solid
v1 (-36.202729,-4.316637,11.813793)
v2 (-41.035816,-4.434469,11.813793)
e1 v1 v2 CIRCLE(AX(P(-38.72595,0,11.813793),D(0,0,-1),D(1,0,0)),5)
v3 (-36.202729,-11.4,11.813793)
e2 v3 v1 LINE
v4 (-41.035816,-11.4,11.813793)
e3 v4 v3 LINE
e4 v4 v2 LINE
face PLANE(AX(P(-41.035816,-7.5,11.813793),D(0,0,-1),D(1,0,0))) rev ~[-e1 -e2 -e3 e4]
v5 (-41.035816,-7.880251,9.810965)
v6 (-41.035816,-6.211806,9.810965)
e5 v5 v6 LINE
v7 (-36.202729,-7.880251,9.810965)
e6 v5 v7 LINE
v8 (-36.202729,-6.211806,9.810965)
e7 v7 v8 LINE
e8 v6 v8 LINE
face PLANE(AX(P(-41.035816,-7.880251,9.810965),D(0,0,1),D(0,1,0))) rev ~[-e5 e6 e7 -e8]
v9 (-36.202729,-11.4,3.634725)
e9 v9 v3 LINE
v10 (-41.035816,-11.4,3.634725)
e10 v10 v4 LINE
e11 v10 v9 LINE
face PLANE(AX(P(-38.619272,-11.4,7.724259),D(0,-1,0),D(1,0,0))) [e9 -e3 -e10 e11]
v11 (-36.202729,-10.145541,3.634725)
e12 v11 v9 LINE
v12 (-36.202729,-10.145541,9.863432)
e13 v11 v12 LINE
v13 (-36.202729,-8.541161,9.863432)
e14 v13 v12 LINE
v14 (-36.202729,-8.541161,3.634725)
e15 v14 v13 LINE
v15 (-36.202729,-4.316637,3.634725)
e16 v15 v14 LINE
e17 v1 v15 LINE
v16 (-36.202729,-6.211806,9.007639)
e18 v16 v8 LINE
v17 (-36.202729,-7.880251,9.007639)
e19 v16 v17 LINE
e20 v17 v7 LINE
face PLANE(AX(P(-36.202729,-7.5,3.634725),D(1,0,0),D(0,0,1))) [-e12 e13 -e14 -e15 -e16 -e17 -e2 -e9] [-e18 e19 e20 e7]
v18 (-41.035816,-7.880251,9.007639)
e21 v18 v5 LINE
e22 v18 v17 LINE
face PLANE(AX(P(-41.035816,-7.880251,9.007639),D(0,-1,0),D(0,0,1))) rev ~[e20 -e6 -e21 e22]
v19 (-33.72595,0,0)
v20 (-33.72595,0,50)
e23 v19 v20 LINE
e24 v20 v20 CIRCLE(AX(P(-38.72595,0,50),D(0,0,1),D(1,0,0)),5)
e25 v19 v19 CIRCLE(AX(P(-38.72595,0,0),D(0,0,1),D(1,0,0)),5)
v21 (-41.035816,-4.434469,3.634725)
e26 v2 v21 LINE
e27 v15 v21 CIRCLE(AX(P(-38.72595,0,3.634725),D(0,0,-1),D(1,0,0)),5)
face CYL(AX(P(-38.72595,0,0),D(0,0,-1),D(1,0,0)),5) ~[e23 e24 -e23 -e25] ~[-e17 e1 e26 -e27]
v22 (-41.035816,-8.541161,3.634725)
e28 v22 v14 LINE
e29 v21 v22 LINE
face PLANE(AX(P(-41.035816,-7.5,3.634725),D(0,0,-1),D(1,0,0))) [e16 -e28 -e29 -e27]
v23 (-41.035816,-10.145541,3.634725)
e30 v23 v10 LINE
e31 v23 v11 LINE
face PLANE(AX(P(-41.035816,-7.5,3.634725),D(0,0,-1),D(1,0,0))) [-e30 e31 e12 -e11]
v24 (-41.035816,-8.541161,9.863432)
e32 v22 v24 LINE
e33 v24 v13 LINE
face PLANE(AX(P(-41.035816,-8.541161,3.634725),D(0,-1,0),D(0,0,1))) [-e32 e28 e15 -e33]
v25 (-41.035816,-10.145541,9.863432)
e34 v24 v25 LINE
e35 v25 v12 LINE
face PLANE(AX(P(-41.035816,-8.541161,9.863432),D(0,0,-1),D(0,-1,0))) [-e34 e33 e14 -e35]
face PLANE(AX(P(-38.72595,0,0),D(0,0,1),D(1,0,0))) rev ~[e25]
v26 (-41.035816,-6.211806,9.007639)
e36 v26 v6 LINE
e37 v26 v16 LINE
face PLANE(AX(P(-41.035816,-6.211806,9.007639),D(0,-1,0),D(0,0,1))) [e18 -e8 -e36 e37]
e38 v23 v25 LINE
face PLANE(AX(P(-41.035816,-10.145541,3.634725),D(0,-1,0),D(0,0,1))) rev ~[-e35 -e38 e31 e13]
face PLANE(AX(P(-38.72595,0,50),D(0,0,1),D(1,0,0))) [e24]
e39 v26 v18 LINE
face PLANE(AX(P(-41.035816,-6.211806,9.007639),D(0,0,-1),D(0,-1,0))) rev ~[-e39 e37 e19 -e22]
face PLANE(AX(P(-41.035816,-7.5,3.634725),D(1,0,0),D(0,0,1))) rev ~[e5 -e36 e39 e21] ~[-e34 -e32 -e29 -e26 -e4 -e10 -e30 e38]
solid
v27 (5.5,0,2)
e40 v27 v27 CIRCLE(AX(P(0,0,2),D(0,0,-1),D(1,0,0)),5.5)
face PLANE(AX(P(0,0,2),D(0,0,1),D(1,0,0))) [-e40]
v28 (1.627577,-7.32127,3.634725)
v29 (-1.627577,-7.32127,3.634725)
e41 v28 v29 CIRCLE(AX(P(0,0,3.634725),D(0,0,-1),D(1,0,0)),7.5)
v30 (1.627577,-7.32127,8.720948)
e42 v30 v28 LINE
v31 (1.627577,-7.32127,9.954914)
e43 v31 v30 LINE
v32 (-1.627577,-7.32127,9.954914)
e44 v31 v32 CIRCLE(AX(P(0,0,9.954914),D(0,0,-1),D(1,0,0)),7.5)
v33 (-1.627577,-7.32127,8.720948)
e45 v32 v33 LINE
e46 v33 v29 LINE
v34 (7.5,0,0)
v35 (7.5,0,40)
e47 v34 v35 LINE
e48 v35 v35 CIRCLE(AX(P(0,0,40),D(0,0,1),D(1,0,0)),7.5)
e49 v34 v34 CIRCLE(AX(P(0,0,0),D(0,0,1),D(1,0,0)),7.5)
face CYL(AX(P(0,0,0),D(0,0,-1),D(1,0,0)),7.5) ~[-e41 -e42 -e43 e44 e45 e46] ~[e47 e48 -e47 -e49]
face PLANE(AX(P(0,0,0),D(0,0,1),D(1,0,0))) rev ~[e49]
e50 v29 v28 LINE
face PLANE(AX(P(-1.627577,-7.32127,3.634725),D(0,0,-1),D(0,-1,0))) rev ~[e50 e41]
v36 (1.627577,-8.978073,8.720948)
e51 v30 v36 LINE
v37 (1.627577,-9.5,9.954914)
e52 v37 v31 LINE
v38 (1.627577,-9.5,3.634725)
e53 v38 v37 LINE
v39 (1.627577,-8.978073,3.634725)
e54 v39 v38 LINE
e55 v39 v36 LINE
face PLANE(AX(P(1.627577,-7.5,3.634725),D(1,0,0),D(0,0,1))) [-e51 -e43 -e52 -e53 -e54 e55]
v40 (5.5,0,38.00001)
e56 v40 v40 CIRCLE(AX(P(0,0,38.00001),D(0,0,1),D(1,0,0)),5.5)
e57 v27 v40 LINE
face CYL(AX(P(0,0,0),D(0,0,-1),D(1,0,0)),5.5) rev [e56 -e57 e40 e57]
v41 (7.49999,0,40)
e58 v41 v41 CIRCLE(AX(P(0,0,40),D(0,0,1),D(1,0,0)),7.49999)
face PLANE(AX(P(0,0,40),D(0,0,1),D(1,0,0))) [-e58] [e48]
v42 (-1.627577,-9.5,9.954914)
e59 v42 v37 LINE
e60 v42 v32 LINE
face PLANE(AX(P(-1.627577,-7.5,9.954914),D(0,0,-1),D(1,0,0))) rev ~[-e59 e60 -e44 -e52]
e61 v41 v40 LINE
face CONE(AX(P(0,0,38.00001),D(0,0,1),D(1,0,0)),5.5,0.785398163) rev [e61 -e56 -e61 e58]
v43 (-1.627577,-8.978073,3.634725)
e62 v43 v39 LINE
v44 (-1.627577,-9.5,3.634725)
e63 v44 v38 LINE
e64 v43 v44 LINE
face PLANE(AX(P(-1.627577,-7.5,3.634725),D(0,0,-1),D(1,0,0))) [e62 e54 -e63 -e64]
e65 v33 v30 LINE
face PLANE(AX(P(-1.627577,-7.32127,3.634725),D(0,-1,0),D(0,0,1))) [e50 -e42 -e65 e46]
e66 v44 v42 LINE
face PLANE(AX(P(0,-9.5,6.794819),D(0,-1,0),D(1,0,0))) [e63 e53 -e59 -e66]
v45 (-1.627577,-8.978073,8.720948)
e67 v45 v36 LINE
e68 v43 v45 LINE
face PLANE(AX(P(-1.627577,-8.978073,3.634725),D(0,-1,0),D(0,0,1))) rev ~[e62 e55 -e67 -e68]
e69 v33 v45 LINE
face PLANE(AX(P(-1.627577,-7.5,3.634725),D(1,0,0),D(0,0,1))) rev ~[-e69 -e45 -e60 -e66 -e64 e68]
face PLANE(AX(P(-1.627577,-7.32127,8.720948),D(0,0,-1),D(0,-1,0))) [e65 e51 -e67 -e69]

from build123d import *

# Parameters (mm, degrees)
F0_R      = 7.5
F1_DEPTH  = 40
F0_R_2    = 5
F2_DEPTH  = 50
F3_T      = -2
F5_W      = 4.8330873251
F5_H      = 8.1790685654
F6_DEPTH  = 3.9
F5_W_2    = 3.2551530749
F5_H_2    = 6.3201887533
F7_DEPTH  = 2
F8_W      = 1.0505022947
F8_H      = 0.8033253253
F8_W_2    = 0.6179423071
F9_DEPTH  = 4.8330873251
F10_W     = 1.6568034714
F10_H     = 5.0862235948
F11_DEPTH = 3.2551530749
F12_SIZE  = 1.99999
F13_W     = 1.6043800861
F13_H     = 6.2287077308
F14_DEPTH = 4.8330873251


# Not quite as in the source:
# - a fillet or chamfer is up to 0.001 mm smaller than in the source, because OpenCascade refuses the exact size
# - a feature names something its author has since deleted; it is built from what else it names


with BuildPart() as f1:
    # F0 (on Top) → F1 (new body)
    with BuildSketch(Plane.XY):
        Circle(F0_R)
    extrude(amount=F1_DEPTH)

    # F3
    f3_openings = [f1.faces().sort_by_distance(p)[0] for p in [
        (0, 0, 40),
    ]]
    offset(amount=F3_T, openings=f3_openings)

    # F5 (on offset) → F7 (join, symmetric)
    with BuildSketch(Plane.XZ.offset(7.5)):
        with Locations((0, 6.7948191427)):
            Rectangle(F5_W_2, F5_H_2)
    extrude(amount=F7_DEPTH, both=True)

    # F10 (on face) → F11 (cut, through all)
    with BuildSketch(Plane(origin=(-1.6275765374, 0, 0), x_dir=(0, -1, 0), z_dir=(-1, 0, 0))):
        with Locations((8.1496717495, 6.1778365634)):
            Rectangle(F10_W, F10_H)
    extrude(amount=-F11_DEPTH, mode=Mode.SUBTRACT)

    # F12 (size 2 in the source; OpenCascade refuses exactly that, so slightly less here)
    f12_edges = [f1.edges().sort_by_distance(p)[0] for p in [
        (-5.5, 0, 40),
    ]]
    chamfer(f12_edges, length=F12_SIZE)


with BuildPart() as f2:
    # F0 (on Top) → F2 (new body)
    with BuildSketch(Plane.XY):
        with Locations((-38.7259498239, 0)):
            Circle(F0_R_2)
    extrude(amount=F2_DEPTH)

    # F5 (on offset) → F6 (join, symmetric)
    with BuildSketch(Plane.XZ.offset(7.5)):
        with Locations((-38.6192724109, 7.7242590487)):
            Rectangle(F5_W, F5_H)
    extrude(amount=F6_DEPTH, both=True)

    # F8 (on face) → F9 (cut, through all)
    with BuildSketch(Plane(origin=(-41.0358160734, 0, 0), x_dir=(0, -1, 0), z_dir=(-1, 0, 0))):
        with Locations((7.3549995432, 9.4093019143)):
            Rectangle(F8_W, F8_H)
        with Locations((6.5207772423, 9.4093019143)):
            Rectangle(F8_W_2, F8_H)
    extrude(amount=-F9_DEPTH, mode=Mode.SUBTRACT)

    # F13 (on face) → F14 (cut, through all)
    with BuildSketch(Plane(origin=(-41.0358160734, 0, 0), x_dir=(0, -1, 0), z_dir=(-1, 0, 0))):
        with Locations((9.3433512375, 6.7490786314)):
            Rectangle(F13_W, F13_H)
    extrude(amount=-F14_DEPTH, mode=Mode.SUBTRACT)


solid = Compound([f1.part, f2.part])
